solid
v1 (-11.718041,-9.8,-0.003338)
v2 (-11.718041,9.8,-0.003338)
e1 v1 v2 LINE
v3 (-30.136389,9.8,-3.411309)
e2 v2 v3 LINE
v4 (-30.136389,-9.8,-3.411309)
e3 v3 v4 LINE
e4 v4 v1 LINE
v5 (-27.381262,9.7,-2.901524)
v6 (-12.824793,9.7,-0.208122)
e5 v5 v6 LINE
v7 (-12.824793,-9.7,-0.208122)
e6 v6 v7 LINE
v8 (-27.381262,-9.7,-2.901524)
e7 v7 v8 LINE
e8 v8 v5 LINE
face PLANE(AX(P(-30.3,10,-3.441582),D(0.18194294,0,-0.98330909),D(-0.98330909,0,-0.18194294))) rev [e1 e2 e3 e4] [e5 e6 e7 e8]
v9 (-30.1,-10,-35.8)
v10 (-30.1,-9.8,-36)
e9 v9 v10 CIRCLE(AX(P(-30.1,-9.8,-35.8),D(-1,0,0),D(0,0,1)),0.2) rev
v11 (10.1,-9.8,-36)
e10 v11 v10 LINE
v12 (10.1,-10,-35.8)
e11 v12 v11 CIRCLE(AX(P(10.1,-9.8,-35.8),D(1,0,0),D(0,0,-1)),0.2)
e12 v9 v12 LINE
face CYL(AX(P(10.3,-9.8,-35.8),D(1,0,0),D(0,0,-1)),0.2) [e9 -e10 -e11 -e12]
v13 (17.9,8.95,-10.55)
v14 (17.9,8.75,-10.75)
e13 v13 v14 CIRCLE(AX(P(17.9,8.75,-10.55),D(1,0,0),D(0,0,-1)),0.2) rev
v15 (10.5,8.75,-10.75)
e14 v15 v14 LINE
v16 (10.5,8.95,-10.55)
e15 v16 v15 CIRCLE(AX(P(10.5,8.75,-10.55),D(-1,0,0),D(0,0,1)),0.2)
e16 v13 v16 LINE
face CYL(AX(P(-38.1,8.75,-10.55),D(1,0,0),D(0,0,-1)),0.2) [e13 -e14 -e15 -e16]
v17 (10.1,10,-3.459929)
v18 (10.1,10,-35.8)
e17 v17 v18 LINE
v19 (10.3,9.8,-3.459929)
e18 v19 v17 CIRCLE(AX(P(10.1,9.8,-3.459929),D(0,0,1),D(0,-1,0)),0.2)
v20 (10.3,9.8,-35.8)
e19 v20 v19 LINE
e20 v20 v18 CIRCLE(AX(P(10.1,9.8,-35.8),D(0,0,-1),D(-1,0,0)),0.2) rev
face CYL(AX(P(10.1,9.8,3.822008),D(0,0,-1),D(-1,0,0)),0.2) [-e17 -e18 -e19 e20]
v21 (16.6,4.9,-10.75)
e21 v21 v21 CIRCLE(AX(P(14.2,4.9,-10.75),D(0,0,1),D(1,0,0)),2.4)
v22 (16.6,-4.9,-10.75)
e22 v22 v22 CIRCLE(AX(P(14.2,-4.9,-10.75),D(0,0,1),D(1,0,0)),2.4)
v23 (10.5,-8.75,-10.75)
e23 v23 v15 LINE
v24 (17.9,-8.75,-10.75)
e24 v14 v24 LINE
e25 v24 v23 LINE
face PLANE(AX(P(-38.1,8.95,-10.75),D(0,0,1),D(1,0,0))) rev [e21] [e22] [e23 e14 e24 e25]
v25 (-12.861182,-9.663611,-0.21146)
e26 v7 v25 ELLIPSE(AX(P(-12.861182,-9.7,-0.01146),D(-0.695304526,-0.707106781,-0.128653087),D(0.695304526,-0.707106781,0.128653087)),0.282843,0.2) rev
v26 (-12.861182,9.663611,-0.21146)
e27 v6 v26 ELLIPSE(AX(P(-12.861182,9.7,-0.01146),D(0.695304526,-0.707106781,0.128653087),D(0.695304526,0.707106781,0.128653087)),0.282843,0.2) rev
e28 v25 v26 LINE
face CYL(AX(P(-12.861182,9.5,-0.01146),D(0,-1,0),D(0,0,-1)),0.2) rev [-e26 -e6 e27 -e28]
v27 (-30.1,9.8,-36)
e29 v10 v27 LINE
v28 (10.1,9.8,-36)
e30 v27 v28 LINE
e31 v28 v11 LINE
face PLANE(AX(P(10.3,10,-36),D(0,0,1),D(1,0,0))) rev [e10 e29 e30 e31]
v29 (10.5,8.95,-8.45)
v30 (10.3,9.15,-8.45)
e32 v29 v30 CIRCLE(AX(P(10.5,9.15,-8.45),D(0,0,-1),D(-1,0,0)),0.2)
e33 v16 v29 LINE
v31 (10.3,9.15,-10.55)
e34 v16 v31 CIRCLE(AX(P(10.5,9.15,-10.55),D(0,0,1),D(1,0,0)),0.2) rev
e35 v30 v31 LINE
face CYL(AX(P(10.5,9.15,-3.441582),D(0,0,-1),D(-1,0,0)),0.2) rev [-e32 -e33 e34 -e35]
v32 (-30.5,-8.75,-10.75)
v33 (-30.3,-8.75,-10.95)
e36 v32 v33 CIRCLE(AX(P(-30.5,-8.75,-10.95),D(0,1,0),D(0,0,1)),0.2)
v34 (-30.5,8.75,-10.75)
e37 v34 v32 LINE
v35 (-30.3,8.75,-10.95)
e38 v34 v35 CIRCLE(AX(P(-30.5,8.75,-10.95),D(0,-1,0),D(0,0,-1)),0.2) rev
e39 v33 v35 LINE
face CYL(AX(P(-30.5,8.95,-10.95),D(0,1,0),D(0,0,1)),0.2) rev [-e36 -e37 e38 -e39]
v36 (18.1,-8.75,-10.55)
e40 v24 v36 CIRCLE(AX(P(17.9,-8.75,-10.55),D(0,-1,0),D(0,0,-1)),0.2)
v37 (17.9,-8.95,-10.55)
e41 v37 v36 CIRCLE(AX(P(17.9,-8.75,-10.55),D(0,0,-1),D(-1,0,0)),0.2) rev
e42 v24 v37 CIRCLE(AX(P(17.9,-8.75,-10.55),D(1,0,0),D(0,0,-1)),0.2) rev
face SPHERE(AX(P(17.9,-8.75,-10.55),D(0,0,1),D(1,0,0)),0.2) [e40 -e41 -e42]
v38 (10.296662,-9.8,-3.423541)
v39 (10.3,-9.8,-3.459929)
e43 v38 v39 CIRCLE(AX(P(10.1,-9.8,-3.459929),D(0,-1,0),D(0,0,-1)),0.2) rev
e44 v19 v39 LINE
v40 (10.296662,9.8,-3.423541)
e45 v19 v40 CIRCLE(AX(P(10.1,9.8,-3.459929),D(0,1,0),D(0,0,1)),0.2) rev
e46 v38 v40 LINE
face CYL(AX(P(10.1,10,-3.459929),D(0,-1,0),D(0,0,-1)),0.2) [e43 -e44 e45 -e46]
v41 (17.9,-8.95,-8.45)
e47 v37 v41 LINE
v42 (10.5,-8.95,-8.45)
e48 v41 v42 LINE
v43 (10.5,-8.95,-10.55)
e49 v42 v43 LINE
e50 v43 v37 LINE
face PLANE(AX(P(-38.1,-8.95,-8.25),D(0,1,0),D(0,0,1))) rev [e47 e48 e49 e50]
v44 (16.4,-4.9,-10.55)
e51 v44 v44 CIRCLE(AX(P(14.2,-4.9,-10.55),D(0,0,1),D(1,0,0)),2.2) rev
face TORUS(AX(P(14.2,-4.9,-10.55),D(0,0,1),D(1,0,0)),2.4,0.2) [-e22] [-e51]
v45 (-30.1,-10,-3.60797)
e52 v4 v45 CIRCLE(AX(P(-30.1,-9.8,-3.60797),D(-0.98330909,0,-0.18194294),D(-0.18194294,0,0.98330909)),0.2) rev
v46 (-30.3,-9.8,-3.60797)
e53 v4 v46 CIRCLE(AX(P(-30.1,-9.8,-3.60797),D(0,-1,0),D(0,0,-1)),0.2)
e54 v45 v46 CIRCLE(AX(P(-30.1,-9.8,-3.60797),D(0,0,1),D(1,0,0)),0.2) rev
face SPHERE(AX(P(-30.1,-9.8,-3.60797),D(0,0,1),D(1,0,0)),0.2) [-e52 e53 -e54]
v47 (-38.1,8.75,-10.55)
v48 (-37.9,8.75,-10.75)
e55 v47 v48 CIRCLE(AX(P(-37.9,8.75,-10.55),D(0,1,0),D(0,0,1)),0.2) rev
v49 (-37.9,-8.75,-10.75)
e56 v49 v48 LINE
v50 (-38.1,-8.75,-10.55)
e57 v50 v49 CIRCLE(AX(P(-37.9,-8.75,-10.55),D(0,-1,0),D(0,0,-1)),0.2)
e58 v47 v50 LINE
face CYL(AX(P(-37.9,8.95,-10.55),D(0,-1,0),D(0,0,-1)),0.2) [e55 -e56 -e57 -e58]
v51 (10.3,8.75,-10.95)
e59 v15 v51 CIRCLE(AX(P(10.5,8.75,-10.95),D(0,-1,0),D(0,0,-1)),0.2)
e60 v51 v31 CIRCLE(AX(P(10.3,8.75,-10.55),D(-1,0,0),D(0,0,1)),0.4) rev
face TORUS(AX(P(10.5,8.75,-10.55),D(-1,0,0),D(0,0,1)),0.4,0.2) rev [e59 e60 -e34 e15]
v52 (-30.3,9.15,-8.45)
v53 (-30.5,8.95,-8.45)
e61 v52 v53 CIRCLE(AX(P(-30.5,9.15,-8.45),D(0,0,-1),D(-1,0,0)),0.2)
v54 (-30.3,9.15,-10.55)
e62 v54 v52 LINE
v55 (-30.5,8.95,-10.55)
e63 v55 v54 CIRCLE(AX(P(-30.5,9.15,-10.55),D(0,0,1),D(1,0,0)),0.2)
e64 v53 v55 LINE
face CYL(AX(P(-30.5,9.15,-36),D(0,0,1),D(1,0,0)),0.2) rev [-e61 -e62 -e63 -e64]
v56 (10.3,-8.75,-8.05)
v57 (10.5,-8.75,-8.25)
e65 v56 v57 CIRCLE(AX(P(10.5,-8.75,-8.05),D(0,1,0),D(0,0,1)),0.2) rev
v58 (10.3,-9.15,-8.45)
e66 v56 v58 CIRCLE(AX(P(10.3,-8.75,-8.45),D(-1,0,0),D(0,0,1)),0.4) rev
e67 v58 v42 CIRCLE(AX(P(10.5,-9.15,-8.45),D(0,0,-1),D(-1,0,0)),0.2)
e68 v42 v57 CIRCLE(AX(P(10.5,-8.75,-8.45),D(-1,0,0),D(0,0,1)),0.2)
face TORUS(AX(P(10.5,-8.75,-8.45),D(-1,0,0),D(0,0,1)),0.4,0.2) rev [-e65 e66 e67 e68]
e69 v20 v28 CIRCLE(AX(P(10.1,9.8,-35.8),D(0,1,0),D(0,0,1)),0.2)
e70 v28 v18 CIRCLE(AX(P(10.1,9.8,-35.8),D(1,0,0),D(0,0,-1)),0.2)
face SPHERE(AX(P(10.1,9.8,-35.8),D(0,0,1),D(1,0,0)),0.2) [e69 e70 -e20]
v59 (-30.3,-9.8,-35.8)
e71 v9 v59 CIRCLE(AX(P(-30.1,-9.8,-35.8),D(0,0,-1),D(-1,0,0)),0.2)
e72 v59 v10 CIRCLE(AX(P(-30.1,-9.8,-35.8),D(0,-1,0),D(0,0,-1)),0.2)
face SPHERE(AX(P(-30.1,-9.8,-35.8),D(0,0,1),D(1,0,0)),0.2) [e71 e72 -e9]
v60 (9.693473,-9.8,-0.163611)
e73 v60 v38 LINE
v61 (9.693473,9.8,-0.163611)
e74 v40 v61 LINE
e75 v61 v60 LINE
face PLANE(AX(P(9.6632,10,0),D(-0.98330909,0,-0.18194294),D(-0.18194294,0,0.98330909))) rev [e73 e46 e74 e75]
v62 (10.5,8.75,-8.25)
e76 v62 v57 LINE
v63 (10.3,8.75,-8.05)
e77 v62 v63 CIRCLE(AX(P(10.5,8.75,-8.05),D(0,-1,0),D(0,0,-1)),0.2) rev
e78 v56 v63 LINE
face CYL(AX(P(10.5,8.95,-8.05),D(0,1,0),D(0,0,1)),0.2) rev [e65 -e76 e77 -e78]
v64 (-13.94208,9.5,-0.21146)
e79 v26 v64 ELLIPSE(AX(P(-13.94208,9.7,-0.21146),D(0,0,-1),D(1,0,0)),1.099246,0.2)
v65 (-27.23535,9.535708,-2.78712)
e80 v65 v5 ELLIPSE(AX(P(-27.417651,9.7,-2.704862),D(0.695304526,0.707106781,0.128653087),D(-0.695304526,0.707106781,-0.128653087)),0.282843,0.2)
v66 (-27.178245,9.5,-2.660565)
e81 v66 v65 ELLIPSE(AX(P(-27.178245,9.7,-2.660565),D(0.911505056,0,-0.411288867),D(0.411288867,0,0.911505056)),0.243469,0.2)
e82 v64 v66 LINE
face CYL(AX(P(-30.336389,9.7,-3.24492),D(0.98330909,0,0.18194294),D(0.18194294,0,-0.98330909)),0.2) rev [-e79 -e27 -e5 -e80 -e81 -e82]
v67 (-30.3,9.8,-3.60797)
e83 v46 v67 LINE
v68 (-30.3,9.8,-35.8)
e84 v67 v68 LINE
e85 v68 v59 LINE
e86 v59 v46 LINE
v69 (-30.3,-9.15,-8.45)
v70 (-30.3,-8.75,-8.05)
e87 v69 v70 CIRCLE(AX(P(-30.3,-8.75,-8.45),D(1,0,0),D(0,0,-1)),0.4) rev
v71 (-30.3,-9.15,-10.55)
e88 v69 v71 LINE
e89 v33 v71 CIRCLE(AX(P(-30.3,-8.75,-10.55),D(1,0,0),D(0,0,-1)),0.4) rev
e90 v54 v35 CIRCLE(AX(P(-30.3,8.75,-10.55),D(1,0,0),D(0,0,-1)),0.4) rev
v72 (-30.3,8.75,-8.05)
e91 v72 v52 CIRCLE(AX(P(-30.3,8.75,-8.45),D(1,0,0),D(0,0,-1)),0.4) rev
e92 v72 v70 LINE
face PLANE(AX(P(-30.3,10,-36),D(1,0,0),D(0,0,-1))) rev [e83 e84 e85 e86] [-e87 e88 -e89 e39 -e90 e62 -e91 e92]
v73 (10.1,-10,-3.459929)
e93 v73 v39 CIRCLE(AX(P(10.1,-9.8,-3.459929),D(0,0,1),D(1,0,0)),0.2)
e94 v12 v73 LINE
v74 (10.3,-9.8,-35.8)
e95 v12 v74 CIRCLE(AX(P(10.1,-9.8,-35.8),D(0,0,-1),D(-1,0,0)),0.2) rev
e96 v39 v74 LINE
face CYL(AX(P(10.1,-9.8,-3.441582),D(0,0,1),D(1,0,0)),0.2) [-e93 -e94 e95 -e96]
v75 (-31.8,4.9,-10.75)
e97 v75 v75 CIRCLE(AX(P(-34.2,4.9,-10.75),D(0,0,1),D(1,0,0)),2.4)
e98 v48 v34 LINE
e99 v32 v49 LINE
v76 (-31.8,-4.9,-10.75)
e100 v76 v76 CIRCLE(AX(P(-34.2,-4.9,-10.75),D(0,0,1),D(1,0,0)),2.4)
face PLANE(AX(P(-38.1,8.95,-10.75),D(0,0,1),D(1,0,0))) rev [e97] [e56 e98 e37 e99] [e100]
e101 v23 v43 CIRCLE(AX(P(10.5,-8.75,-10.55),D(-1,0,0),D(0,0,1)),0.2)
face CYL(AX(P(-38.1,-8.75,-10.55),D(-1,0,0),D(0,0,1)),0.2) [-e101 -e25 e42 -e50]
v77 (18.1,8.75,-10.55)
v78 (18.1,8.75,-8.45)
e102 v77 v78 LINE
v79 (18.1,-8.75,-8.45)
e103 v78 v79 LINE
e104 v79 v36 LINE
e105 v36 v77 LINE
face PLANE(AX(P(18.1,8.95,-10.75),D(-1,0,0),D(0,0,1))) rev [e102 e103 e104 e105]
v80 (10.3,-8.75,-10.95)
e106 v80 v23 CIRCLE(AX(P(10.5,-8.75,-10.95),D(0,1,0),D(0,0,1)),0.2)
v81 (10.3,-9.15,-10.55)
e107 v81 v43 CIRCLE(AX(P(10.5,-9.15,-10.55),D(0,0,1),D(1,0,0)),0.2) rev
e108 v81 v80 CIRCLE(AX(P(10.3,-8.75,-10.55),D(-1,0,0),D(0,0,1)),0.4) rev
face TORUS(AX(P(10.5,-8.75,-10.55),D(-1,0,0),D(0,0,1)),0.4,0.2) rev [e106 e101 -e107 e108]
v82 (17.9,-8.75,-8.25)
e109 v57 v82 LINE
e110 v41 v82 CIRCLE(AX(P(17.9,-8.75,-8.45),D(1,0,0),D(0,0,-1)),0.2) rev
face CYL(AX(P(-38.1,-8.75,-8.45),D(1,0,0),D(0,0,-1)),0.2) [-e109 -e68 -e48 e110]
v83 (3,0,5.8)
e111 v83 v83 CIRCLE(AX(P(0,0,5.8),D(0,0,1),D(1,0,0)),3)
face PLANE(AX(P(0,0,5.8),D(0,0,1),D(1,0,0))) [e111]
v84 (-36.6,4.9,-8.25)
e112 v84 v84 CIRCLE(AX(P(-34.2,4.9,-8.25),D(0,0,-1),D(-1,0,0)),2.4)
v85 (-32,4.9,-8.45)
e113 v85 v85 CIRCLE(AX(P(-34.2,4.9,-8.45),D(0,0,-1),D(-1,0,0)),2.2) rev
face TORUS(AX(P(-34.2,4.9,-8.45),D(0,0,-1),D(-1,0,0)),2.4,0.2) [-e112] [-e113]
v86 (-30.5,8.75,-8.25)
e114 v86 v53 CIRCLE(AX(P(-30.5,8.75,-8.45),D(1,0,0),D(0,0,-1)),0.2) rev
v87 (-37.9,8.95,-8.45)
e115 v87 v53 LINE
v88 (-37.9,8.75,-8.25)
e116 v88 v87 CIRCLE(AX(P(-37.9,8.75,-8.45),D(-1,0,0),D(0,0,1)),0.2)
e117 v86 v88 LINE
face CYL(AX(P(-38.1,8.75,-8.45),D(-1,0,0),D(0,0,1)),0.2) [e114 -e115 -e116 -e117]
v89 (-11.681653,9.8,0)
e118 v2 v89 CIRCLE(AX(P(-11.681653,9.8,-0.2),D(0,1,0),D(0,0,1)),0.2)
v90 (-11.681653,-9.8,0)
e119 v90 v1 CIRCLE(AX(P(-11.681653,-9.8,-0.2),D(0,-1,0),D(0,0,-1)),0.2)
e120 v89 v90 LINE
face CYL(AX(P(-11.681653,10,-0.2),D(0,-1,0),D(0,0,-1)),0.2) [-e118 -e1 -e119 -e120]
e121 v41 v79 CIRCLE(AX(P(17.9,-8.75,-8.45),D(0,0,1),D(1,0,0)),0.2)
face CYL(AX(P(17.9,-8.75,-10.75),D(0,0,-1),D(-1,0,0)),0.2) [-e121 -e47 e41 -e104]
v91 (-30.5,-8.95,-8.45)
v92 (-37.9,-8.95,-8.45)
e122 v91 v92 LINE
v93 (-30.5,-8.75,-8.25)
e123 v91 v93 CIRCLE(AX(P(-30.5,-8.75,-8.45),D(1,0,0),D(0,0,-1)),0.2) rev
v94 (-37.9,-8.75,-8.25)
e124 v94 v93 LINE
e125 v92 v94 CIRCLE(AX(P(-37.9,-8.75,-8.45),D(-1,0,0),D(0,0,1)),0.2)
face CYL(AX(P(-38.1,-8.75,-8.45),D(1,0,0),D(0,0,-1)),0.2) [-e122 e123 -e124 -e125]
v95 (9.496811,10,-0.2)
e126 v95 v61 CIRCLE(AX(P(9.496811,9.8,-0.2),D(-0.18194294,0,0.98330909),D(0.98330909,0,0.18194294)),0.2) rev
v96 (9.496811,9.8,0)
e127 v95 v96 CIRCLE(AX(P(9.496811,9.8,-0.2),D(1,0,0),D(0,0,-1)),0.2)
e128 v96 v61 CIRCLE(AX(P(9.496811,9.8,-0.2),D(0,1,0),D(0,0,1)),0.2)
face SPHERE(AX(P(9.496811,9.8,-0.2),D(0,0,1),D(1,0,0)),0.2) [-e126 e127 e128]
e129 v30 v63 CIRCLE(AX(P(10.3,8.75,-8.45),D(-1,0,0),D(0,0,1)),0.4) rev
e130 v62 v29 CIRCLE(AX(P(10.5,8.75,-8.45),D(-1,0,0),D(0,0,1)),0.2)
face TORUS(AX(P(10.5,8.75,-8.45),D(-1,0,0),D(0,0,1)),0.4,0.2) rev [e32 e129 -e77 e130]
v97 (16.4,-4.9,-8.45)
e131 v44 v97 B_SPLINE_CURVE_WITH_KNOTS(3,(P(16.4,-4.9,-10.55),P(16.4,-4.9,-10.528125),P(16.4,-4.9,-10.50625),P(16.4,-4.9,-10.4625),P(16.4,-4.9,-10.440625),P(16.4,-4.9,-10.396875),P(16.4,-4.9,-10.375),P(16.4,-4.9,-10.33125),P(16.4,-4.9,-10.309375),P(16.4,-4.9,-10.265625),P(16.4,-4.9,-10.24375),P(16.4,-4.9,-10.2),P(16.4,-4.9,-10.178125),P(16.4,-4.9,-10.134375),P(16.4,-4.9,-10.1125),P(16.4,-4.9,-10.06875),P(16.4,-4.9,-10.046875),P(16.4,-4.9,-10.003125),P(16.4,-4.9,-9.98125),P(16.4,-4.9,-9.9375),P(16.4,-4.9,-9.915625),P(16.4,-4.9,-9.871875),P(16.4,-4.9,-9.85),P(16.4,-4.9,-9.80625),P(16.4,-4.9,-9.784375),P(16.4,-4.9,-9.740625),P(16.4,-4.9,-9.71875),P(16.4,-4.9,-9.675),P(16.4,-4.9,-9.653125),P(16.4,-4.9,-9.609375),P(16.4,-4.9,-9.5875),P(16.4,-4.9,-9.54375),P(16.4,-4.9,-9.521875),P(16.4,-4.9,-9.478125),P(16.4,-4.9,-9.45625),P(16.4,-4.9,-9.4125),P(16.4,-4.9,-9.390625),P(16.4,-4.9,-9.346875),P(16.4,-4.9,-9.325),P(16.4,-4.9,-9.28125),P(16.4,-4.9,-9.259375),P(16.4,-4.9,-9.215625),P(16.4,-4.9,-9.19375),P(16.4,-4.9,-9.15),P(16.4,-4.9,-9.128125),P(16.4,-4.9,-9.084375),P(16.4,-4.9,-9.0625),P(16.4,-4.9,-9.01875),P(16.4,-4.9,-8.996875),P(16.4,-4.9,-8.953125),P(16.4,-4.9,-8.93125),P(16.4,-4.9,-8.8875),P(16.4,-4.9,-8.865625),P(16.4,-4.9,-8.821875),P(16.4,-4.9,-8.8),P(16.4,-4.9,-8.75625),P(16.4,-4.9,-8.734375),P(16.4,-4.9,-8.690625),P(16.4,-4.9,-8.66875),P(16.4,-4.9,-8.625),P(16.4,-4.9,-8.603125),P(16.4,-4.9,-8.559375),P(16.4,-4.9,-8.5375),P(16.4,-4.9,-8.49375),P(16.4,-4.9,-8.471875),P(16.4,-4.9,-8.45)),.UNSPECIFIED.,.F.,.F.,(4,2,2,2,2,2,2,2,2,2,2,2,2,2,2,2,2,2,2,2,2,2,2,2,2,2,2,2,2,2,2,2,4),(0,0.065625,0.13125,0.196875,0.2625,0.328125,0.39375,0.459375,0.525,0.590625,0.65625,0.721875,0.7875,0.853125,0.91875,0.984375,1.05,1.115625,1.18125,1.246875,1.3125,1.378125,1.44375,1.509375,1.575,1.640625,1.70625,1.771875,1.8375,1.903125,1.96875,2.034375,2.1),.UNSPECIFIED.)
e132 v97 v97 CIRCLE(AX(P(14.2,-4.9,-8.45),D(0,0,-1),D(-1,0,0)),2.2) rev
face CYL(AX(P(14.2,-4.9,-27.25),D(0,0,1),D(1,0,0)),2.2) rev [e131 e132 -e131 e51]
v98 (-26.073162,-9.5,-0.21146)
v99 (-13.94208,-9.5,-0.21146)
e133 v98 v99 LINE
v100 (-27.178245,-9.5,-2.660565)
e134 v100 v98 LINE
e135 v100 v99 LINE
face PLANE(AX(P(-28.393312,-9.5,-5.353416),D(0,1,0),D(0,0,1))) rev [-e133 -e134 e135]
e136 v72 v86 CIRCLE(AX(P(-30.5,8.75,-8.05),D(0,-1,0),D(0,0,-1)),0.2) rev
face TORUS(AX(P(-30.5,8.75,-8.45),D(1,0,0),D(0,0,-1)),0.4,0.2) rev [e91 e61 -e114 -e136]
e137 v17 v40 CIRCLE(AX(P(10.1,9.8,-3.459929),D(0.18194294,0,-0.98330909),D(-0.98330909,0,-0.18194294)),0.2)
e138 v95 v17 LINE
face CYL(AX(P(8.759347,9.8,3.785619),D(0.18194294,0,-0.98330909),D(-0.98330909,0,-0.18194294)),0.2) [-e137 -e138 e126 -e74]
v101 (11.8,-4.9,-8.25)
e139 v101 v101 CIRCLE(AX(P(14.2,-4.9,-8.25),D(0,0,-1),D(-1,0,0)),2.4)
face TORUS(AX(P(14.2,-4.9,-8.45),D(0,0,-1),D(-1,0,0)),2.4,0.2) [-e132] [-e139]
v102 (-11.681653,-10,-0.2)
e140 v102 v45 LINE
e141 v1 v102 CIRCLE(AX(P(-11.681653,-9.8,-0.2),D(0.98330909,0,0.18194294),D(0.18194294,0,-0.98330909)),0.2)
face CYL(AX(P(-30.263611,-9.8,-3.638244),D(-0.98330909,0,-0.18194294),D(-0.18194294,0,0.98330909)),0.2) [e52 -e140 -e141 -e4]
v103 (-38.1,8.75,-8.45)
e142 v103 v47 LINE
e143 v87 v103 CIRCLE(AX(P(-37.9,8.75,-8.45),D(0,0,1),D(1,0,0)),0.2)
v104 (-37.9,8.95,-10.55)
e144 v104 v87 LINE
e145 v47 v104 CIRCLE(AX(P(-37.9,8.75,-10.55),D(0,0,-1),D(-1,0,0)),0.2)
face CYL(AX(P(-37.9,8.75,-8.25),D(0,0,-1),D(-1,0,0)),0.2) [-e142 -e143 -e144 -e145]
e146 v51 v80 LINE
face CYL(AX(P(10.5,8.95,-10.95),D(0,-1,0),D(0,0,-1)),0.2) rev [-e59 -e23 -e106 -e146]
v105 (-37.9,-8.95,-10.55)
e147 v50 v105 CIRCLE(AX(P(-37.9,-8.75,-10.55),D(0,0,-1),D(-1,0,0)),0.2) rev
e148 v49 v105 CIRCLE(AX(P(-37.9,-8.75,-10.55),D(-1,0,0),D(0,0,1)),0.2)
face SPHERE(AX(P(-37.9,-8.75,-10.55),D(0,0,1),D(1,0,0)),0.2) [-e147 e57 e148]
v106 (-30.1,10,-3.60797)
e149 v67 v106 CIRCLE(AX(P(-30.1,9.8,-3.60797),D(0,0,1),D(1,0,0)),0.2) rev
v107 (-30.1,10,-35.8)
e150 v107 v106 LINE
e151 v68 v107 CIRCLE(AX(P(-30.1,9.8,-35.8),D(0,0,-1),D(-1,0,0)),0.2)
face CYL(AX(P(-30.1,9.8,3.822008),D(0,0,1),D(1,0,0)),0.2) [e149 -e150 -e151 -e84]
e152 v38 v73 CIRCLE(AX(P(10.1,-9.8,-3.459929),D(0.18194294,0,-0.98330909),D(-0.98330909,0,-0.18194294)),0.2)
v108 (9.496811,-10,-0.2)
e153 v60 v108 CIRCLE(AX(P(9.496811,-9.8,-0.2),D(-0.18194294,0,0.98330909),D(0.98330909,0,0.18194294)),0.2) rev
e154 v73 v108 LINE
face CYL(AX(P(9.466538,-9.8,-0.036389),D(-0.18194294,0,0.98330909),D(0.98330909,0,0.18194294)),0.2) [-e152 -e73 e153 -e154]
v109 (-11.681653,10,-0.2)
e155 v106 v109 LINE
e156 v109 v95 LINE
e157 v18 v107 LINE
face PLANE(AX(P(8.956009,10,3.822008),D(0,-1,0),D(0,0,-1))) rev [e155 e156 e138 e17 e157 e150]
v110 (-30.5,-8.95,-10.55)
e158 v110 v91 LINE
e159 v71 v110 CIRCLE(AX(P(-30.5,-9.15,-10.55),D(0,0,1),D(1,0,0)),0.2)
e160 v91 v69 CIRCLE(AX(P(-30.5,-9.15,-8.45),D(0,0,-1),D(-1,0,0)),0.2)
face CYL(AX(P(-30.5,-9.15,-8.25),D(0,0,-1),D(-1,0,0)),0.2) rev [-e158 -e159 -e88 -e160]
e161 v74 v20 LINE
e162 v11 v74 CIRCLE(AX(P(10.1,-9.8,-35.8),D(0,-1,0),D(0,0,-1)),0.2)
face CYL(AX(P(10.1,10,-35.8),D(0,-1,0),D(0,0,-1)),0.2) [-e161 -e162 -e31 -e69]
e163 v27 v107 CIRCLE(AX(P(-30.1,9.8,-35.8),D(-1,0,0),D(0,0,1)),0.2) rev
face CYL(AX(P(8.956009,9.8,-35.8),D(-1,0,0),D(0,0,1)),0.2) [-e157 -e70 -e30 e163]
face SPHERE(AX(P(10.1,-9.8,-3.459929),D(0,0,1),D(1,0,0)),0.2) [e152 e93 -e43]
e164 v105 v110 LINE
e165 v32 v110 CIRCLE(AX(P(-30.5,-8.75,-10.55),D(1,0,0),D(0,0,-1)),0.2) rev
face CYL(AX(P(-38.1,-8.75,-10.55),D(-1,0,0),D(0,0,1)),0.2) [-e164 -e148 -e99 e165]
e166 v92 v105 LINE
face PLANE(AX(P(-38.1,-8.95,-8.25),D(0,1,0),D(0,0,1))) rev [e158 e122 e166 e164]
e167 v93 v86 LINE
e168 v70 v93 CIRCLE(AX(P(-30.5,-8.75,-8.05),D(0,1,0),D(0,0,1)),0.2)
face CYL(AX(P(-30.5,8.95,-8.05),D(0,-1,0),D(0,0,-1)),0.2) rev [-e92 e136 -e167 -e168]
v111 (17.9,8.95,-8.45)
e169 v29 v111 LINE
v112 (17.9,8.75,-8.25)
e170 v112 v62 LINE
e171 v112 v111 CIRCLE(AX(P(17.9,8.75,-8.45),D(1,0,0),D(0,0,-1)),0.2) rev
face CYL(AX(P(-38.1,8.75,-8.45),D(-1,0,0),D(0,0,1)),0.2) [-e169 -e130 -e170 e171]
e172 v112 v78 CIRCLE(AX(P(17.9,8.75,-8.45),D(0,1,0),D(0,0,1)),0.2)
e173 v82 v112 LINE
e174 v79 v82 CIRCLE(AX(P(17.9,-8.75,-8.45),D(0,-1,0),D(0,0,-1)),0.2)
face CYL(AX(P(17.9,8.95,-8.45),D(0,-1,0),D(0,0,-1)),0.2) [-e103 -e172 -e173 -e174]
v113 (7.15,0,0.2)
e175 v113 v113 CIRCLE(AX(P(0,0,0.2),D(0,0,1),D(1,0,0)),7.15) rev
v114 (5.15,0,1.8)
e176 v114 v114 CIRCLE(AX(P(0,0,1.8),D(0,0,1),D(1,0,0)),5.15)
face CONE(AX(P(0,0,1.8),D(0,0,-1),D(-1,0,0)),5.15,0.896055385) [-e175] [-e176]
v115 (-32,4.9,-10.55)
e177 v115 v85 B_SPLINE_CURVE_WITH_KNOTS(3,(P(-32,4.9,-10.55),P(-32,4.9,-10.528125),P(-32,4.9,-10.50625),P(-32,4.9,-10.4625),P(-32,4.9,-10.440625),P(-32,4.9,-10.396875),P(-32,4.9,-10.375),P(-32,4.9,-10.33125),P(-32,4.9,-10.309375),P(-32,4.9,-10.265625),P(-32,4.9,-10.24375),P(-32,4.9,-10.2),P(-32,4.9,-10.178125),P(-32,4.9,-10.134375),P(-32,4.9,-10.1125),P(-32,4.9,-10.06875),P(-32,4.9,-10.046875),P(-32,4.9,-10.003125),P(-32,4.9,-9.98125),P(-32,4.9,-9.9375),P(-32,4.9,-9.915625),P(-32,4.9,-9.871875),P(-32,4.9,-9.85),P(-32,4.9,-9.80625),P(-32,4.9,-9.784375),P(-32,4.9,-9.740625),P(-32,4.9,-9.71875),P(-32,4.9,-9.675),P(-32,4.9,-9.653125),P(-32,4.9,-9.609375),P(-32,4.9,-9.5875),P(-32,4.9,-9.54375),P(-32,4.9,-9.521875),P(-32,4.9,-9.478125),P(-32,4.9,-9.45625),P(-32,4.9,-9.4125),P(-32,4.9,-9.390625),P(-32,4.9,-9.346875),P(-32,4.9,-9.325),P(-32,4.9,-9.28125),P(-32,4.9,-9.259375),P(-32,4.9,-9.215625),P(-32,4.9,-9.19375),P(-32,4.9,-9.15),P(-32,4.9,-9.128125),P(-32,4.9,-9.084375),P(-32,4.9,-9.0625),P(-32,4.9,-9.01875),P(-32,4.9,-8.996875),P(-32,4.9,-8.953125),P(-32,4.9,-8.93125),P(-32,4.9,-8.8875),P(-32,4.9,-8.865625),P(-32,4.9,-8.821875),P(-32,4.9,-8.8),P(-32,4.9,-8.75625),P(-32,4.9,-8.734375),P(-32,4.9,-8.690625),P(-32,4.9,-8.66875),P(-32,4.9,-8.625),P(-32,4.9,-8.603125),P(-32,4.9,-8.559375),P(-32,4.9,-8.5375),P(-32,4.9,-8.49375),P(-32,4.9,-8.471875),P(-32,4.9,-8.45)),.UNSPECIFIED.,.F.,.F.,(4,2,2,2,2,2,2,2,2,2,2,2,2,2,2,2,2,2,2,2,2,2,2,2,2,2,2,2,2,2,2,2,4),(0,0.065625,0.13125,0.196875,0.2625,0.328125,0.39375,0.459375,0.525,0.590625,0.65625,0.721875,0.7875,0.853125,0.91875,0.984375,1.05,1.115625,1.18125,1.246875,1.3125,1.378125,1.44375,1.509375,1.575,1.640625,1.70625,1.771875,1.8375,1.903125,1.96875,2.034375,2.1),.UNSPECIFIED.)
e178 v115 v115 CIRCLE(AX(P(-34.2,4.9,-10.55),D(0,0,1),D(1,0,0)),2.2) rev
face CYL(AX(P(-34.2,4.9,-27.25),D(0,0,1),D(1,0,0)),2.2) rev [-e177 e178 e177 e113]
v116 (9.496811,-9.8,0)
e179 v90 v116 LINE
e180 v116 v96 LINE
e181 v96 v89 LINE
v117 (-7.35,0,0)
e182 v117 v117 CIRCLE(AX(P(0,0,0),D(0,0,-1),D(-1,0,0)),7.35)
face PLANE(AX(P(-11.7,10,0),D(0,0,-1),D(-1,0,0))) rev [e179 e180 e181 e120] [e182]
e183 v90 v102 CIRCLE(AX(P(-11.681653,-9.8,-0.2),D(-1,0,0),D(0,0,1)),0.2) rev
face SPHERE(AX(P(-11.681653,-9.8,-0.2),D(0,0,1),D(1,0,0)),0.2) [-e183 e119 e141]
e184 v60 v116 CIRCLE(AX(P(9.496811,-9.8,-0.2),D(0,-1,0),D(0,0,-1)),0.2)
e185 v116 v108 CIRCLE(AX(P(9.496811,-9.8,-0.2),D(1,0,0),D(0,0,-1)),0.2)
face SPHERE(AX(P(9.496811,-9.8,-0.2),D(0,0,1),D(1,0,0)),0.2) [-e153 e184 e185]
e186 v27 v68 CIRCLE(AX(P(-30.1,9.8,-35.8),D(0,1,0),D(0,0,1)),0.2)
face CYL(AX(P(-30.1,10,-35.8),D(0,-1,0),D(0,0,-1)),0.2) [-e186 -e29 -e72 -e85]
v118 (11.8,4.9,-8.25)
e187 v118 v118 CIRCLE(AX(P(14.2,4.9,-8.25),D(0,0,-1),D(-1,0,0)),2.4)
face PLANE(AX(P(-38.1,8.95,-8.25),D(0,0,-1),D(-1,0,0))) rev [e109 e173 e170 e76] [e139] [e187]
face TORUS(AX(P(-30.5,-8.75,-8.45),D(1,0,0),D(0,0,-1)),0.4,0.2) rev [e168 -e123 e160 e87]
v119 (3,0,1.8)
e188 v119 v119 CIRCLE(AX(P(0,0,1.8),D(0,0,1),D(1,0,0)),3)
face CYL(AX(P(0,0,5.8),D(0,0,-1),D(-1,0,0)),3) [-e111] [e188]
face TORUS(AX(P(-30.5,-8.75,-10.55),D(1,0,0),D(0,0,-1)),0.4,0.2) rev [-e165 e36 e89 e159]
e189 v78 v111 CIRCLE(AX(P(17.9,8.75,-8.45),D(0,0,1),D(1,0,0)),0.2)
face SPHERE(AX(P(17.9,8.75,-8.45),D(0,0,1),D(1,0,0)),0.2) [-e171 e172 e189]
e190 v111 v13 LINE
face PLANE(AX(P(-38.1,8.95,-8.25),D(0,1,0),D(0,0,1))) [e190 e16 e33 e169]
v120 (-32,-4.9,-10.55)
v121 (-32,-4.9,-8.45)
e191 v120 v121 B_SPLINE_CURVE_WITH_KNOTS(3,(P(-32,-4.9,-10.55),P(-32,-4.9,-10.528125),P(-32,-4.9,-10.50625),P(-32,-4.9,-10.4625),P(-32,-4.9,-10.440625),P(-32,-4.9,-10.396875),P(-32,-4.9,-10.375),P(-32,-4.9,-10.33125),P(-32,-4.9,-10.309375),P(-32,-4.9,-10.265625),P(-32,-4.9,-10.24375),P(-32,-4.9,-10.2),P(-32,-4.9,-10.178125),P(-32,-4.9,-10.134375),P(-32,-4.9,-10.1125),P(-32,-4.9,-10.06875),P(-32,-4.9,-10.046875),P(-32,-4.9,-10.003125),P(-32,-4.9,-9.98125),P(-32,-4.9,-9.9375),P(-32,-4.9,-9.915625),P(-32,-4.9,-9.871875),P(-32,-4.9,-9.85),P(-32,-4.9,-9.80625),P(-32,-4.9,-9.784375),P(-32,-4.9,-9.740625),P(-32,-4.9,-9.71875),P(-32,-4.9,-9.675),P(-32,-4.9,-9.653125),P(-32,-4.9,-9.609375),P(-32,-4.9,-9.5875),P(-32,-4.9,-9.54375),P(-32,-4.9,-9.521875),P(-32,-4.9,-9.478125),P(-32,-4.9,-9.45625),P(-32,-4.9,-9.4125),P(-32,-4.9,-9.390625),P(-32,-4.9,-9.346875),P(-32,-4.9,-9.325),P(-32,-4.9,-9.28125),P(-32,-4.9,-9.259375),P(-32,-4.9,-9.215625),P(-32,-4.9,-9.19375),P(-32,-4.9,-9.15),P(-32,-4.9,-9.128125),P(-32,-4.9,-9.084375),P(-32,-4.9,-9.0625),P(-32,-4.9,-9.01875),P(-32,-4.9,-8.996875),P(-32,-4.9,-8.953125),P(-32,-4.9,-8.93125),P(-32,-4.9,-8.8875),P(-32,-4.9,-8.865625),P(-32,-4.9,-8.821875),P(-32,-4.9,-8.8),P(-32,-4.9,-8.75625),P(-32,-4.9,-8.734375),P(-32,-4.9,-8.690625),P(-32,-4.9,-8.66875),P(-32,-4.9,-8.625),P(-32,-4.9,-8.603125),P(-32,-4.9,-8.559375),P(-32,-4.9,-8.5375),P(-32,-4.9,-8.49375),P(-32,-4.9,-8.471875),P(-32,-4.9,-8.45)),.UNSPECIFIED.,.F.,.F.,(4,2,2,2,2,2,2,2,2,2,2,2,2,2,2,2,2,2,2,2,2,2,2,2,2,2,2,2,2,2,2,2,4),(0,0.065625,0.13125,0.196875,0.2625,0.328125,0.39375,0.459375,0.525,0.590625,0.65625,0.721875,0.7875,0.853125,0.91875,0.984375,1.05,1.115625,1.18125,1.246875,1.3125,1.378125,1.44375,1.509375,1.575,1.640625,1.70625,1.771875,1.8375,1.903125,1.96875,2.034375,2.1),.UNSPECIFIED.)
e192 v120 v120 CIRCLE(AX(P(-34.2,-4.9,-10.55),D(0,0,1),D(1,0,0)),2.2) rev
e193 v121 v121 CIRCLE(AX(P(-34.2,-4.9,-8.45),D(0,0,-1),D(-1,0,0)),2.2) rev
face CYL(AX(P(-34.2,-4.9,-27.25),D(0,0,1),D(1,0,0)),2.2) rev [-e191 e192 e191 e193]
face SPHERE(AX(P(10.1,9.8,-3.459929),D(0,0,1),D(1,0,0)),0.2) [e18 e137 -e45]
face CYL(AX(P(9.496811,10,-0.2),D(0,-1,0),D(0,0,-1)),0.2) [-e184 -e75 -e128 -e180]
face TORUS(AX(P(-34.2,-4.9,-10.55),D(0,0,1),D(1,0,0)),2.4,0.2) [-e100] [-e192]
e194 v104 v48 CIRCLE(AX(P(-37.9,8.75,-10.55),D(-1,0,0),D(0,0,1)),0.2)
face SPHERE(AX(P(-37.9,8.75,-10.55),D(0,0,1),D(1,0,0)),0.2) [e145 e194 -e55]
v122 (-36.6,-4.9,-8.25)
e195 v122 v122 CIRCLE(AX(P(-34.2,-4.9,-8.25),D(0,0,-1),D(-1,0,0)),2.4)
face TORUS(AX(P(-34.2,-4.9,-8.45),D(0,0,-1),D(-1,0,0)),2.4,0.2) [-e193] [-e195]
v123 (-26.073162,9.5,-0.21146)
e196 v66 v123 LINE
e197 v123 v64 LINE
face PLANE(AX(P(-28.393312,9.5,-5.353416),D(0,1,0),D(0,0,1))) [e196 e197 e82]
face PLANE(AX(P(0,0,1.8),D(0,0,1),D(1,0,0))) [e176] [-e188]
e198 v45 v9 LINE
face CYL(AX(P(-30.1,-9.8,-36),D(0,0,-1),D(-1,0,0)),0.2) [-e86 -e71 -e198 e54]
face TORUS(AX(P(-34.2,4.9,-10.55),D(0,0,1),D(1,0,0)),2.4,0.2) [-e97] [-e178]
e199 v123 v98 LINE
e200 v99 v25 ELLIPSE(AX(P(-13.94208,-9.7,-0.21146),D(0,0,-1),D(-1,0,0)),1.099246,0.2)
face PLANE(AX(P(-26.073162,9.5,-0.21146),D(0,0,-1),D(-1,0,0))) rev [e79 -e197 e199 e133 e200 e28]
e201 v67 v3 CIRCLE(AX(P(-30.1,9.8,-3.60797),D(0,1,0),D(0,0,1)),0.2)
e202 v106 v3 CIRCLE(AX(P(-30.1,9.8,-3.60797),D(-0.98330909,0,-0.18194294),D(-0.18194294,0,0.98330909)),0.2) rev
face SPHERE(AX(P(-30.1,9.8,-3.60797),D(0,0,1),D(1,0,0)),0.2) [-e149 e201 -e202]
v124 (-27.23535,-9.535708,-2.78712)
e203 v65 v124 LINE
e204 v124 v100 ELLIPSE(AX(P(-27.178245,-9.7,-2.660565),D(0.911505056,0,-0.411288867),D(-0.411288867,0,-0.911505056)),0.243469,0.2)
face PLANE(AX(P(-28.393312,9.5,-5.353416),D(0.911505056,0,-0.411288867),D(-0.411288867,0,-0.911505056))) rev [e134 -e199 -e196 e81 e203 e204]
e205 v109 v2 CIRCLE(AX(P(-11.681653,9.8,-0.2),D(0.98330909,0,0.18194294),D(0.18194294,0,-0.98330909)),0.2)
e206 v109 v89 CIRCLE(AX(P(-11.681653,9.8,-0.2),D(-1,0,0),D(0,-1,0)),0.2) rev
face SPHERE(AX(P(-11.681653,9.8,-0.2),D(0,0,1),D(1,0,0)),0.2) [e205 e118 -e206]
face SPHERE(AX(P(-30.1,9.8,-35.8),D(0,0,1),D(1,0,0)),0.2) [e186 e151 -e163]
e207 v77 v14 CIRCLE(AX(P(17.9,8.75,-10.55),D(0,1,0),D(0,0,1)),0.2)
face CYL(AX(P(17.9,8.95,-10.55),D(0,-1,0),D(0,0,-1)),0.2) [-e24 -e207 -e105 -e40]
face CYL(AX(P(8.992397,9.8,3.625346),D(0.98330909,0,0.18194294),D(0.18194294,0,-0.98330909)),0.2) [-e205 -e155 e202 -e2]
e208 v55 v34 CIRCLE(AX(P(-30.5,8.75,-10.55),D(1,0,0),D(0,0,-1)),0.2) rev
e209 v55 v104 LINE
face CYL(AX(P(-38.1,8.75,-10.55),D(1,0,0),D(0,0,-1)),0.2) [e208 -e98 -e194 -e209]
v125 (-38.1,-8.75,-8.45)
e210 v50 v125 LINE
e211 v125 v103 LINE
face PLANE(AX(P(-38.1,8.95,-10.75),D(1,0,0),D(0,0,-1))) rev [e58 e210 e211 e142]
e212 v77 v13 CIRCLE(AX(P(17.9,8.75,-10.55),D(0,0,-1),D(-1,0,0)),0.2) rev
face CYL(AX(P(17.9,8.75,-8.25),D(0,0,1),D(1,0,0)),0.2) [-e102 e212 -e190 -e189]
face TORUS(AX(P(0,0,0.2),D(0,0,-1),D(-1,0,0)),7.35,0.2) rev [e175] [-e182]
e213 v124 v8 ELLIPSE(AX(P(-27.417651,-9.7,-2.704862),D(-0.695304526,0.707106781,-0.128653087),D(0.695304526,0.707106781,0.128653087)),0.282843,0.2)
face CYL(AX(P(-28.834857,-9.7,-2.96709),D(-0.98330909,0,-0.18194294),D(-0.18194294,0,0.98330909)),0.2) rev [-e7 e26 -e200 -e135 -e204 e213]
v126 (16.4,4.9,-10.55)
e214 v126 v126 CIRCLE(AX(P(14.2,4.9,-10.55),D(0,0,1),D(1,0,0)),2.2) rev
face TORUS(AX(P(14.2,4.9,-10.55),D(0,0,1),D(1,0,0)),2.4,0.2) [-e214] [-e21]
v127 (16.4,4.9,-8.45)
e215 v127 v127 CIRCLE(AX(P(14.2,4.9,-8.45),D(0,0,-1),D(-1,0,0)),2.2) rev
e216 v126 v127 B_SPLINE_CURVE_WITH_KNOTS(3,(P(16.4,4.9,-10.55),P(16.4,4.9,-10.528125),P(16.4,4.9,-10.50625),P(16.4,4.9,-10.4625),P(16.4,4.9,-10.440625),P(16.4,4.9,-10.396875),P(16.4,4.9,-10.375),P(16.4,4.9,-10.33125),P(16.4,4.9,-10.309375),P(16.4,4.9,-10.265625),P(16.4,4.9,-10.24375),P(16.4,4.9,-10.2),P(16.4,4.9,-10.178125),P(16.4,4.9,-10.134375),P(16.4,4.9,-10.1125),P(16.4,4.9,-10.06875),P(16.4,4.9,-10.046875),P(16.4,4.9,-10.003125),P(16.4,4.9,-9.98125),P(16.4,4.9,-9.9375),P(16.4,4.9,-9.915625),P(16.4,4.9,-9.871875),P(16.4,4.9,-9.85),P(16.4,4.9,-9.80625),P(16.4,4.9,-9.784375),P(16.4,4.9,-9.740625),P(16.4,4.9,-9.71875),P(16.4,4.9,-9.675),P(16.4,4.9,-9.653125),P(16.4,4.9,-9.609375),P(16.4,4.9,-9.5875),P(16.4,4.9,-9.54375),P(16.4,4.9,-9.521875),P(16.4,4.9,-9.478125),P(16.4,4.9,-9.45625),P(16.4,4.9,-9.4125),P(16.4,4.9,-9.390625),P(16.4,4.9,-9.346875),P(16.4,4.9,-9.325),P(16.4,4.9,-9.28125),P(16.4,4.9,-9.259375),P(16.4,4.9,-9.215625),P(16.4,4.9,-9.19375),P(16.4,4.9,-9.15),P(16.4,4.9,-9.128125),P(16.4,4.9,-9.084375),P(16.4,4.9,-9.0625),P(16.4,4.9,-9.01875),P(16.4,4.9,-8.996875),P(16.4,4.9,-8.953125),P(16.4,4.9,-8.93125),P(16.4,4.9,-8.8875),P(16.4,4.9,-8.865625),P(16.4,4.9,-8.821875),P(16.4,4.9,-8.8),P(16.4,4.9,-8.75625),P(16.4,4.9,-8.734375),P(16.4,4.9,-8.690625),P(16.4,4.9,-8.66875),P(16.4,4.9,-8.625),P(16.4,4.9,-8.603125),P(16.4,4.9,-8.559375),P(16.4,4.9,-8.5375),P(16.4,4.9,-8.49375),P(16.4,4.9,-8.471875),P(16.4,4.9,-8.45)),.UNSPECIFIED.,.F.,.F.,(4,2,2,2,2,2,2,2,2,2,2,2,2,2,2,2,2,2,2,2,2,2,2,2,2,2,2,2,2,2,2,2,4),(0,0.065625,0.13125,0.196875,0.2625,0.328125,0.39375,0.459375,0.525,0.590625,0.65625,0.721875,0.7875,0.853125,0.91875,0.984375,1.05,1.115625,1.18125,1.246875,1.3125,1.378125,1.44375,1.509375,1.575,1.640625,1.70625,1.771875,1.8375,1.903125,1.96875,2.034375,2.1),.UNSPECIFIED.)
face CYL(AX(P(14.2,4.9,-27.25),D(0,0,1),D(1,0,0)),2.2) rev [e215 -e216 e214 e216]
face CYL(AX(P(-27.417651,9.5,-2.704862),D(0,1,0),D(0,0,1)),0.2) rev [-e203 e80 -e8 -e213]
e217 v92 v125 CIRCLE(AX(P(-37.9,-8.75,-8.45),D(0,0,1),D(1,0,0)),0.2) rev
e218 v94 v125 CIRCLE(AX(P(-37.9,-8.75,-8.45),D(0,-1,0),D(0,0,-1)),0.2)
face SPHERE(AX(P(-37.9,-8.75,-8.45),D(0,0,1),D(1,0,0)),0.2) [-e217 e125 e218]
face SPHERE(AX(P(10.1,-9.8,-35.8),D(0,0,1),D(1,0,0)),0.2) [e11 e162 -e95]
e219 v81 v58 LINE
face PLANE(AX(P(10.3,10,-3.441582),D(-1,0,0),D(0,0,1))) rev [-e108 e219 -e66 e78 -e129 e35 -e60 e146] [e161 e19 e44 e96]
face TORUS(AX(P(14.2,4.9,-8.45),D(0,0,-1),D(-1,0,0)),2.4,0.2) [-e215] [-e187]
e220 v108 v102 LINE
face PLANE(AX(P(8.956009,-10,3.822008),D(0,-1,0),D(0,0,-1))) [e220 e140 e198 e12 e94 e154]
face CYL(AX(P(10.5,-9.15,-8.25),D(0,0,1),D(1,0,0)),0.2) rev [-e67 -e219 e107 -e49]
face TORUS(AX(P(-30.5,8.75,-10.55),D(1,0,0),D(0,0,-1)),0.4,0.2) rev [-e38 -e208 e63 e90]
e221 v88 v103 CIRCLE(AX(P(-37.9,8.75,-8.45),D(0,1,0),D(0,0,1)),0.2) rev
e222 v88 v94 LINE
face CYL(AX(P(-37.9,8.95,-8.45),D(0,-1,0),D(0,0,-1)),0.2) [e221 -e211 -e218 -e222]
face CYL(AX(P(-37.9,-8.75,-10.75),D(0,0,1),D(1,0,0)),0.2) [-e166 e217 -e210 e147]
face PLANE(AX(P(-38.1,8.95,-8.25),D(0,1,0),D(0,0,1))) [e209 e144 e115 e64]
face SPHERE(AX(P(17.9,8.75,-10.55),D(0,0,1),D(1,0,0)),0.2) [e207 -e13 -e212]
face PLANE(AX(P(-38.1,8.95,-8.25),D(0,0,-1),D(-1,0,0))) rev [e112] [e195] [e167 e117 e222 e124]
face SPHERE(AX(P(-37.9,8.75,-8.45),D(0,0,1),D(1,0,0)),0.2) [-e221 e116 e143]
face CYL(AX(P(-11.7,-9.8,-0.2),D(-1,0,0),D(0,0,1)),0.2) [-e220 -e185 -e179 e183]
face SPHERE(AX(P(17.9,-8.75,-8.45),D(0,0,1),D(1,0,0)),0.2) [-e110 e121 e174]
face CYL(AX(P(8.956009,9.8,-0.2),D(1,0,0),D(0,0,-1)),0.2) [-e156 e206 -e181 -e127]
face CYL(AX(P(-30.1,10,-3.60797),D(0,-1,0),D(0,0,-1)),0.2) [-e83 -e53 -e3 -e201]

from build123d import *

# Parameters (mm, degrees)
EXTRUDE1_DEPTH = 10
SKETCH2_W      = 56.2
SKETCH2_H      = 2.5
EXTRUDE2_DEPTH = 8.95
SKETCH3_R      = 7.15
EXTRUDE3_DEPTH = 1.8
SKETCH4_R      = 3
EXTRUDE4_DEPTH = 4
CHAMFER1_SIZE  = 1.6
CHAMFER1_SIZE2 = 2
EXTRUDE5_DEPTH = 9.5
SKETCH6_R      = 2.2
EXTRUDE6_DEPTH = 19
FILLET2_R      = 0.2


with BuildPart() as part:
    # Sketch1 → Extrude1 (new, symmetric)
    with BuildSketch(Plane(origin=(0, 0, 0), x_dir=(1, 0, 0), z_dir=(0, 1, 0))):
        Polygon((-11.7, 0), (9.66319971, 0), (10.3, 3.441581815), (10.3, 36), (-30.3, 36), (-30.3, 3.441581815), align=None)
    extrude(amount=EXTRUDE1_DEPTH, both=True)

    # Sketch2 → Extrude2 (add, symmetric)
    with BuildSketch(Plane(origin=(0, 0, 0), x_dir=(1, 0, 0), z_dir=(0, 1, 0))):
        with Locations((-10, 9.5)):
            Rectangle(SKETCH2_W, SKETCH2_H)
    extrude(amount=EXTRUDE2_DEPTH, both=True)

    # Sketch3 → Extrude3 (add)
    with BuildSketch(Plane.XY):
        with Locations(Location((0, 0, 0), (0, 0, 180))):
            Circle(SKETCH3_R)
    extrude(amount=EXTRUDE3_DEPTH)

    # Sketch4 → Extrude4 (add)
    with BuildSketch(Plane.XY.offset(1.8)):
        Circle(SKETCH4_R)
    extrude(amount=EXTRUDE4_DEPTH)

    # Chamfer1
    chamfer1_edges = [part.edges().sort_by_distance(p)[0] for p in [
        (7.15, 0, 1.8),
    ]]
    chamfer1_side = [part.faces().sort_by_distance(p)[0] for p in [
        (7.15, 0, 0.9),
    ]]
    chamfer(chamfer1_edges, length=CHAMFER1_SIZE, length2=CHAMFER1_SIZE2, reference=chamfer1_side[0])

    # Sketch5 → Extrude5 (add, symmetric)
    with BuildSketch(Plane(origin=(0, 0, 0), x_dir=(1, 0, 0), z_dir=(0, 1, 0))):
        Polygon((-28.393312248, 5.35341563), (-26.073161564, 0.211460059), (-8.26443739, 0.211460059), align=None)
    extrude(amount=EXTRUDE5_DEPTH, both=True)

    # Sketch6 → Extrude6 (cut)
    with BuildSketch(Plane.XY.offset(-8.25)):
        with Locations((14.2, 4.9)):
            Circle(SKETCH6_R)
        with Locations((14.2, -4.9)):
            Circle(SKETCH6_R)
        with Locations((-34.2, -4.9)):
            Circle(SKETCH6_R)
        with Locations((-34.2, 4.9)):
            Circle(SKETCH6_R)
    extrude(amount=-EXTRUDE6_DEPTH, mode=Mode.SUBTRACT)

    # Fillet2
    fillet2_edges = [part.edges().sort_by_distance(p)[0] for p in [
        (-10, 10, -36),
        (9.66319971, 0, 0),
        (-11.7, 0, 0),
        (-30.3, 0, -3.441581815),
        (-30.3, 0, -36),
        (10.3, 0, -36),
        (10.3, 0, -3.441581815),
        (-30.3, 10, -19.720790908),
        (-21, 10, -1.720790908),
        (-1.018400145, 10, 0),
        (-30.3, -8.95, -9.5),
        (-30.3, 0, -10.75),
        (-30.3, 0, -8.25),
        (-30.3, 8.95, -9.5),
        (10.3, 0, -8.25),
        (14.2, -8.95, -8.25),
        (-34.2, -8.95, -8.25),
        (-38.1, 0, -8.25),
        (14.2, -8.95, -10.75),
        (10.3, 0, -10.75),
        (18.1, 0, -10.75),
        (-34.2, -8.95, -10.75),
        (14.2, 8.95, -8.25),
        (18.1, 8.95, -9.5),
        (14.2, 8.95, -10.75),
        (-34.2, 8.95, -10.75),
        (-38.1, 8.95, -9.5),
        (-34.2, 8.95, -8.25),
        (10.3, -8.95, -9.5),
        (-38.1, -8.95, -9.5),
        (-38.1, 0, -10.75),
        (18.1, -8.95, -9.5),
        (18.1, 0, -8.25),
        (10.3, 8.95, -9.5),
        (9.981599855, 10, -1.720790908),
        (7.15, 0, 0),
        (-20.060607769, -9.5, -1.54697396),
        (-12.842834112, 0, -0.211460059),
        (-27.278381426, 0, -2.882487862),
        (-20.060607769, 9.5, -1.54697396),
        (-1.018400145, -10, 0),
        (-21, -10, -1.720790908),
        (-30.3, -10, -19.720790908),
        (10.3, 10, -19.720790908),
        (-10, -10, -36),
        (12, 4.9, -10.75),
        (12, 4.9, -8.25),
        (10.3, -10, -19.720790908),
        (12, -4.9, -10.75),
        (12, -4.9, -8.25),
        (9.981599855, -10, -1.720790908),
        (-36.4, -4.9, -10.75),
        (-36.4, -4.9, -8.25),
        (-36.4, 4.9, -10.75),
        (-36.4, 4.9, -8.25),
    ]]
    fillet(fillet2_edges, radius=FILLET2_R - 0.0001)  # a hair under: the kernel refuses the full size


solid = part.part
